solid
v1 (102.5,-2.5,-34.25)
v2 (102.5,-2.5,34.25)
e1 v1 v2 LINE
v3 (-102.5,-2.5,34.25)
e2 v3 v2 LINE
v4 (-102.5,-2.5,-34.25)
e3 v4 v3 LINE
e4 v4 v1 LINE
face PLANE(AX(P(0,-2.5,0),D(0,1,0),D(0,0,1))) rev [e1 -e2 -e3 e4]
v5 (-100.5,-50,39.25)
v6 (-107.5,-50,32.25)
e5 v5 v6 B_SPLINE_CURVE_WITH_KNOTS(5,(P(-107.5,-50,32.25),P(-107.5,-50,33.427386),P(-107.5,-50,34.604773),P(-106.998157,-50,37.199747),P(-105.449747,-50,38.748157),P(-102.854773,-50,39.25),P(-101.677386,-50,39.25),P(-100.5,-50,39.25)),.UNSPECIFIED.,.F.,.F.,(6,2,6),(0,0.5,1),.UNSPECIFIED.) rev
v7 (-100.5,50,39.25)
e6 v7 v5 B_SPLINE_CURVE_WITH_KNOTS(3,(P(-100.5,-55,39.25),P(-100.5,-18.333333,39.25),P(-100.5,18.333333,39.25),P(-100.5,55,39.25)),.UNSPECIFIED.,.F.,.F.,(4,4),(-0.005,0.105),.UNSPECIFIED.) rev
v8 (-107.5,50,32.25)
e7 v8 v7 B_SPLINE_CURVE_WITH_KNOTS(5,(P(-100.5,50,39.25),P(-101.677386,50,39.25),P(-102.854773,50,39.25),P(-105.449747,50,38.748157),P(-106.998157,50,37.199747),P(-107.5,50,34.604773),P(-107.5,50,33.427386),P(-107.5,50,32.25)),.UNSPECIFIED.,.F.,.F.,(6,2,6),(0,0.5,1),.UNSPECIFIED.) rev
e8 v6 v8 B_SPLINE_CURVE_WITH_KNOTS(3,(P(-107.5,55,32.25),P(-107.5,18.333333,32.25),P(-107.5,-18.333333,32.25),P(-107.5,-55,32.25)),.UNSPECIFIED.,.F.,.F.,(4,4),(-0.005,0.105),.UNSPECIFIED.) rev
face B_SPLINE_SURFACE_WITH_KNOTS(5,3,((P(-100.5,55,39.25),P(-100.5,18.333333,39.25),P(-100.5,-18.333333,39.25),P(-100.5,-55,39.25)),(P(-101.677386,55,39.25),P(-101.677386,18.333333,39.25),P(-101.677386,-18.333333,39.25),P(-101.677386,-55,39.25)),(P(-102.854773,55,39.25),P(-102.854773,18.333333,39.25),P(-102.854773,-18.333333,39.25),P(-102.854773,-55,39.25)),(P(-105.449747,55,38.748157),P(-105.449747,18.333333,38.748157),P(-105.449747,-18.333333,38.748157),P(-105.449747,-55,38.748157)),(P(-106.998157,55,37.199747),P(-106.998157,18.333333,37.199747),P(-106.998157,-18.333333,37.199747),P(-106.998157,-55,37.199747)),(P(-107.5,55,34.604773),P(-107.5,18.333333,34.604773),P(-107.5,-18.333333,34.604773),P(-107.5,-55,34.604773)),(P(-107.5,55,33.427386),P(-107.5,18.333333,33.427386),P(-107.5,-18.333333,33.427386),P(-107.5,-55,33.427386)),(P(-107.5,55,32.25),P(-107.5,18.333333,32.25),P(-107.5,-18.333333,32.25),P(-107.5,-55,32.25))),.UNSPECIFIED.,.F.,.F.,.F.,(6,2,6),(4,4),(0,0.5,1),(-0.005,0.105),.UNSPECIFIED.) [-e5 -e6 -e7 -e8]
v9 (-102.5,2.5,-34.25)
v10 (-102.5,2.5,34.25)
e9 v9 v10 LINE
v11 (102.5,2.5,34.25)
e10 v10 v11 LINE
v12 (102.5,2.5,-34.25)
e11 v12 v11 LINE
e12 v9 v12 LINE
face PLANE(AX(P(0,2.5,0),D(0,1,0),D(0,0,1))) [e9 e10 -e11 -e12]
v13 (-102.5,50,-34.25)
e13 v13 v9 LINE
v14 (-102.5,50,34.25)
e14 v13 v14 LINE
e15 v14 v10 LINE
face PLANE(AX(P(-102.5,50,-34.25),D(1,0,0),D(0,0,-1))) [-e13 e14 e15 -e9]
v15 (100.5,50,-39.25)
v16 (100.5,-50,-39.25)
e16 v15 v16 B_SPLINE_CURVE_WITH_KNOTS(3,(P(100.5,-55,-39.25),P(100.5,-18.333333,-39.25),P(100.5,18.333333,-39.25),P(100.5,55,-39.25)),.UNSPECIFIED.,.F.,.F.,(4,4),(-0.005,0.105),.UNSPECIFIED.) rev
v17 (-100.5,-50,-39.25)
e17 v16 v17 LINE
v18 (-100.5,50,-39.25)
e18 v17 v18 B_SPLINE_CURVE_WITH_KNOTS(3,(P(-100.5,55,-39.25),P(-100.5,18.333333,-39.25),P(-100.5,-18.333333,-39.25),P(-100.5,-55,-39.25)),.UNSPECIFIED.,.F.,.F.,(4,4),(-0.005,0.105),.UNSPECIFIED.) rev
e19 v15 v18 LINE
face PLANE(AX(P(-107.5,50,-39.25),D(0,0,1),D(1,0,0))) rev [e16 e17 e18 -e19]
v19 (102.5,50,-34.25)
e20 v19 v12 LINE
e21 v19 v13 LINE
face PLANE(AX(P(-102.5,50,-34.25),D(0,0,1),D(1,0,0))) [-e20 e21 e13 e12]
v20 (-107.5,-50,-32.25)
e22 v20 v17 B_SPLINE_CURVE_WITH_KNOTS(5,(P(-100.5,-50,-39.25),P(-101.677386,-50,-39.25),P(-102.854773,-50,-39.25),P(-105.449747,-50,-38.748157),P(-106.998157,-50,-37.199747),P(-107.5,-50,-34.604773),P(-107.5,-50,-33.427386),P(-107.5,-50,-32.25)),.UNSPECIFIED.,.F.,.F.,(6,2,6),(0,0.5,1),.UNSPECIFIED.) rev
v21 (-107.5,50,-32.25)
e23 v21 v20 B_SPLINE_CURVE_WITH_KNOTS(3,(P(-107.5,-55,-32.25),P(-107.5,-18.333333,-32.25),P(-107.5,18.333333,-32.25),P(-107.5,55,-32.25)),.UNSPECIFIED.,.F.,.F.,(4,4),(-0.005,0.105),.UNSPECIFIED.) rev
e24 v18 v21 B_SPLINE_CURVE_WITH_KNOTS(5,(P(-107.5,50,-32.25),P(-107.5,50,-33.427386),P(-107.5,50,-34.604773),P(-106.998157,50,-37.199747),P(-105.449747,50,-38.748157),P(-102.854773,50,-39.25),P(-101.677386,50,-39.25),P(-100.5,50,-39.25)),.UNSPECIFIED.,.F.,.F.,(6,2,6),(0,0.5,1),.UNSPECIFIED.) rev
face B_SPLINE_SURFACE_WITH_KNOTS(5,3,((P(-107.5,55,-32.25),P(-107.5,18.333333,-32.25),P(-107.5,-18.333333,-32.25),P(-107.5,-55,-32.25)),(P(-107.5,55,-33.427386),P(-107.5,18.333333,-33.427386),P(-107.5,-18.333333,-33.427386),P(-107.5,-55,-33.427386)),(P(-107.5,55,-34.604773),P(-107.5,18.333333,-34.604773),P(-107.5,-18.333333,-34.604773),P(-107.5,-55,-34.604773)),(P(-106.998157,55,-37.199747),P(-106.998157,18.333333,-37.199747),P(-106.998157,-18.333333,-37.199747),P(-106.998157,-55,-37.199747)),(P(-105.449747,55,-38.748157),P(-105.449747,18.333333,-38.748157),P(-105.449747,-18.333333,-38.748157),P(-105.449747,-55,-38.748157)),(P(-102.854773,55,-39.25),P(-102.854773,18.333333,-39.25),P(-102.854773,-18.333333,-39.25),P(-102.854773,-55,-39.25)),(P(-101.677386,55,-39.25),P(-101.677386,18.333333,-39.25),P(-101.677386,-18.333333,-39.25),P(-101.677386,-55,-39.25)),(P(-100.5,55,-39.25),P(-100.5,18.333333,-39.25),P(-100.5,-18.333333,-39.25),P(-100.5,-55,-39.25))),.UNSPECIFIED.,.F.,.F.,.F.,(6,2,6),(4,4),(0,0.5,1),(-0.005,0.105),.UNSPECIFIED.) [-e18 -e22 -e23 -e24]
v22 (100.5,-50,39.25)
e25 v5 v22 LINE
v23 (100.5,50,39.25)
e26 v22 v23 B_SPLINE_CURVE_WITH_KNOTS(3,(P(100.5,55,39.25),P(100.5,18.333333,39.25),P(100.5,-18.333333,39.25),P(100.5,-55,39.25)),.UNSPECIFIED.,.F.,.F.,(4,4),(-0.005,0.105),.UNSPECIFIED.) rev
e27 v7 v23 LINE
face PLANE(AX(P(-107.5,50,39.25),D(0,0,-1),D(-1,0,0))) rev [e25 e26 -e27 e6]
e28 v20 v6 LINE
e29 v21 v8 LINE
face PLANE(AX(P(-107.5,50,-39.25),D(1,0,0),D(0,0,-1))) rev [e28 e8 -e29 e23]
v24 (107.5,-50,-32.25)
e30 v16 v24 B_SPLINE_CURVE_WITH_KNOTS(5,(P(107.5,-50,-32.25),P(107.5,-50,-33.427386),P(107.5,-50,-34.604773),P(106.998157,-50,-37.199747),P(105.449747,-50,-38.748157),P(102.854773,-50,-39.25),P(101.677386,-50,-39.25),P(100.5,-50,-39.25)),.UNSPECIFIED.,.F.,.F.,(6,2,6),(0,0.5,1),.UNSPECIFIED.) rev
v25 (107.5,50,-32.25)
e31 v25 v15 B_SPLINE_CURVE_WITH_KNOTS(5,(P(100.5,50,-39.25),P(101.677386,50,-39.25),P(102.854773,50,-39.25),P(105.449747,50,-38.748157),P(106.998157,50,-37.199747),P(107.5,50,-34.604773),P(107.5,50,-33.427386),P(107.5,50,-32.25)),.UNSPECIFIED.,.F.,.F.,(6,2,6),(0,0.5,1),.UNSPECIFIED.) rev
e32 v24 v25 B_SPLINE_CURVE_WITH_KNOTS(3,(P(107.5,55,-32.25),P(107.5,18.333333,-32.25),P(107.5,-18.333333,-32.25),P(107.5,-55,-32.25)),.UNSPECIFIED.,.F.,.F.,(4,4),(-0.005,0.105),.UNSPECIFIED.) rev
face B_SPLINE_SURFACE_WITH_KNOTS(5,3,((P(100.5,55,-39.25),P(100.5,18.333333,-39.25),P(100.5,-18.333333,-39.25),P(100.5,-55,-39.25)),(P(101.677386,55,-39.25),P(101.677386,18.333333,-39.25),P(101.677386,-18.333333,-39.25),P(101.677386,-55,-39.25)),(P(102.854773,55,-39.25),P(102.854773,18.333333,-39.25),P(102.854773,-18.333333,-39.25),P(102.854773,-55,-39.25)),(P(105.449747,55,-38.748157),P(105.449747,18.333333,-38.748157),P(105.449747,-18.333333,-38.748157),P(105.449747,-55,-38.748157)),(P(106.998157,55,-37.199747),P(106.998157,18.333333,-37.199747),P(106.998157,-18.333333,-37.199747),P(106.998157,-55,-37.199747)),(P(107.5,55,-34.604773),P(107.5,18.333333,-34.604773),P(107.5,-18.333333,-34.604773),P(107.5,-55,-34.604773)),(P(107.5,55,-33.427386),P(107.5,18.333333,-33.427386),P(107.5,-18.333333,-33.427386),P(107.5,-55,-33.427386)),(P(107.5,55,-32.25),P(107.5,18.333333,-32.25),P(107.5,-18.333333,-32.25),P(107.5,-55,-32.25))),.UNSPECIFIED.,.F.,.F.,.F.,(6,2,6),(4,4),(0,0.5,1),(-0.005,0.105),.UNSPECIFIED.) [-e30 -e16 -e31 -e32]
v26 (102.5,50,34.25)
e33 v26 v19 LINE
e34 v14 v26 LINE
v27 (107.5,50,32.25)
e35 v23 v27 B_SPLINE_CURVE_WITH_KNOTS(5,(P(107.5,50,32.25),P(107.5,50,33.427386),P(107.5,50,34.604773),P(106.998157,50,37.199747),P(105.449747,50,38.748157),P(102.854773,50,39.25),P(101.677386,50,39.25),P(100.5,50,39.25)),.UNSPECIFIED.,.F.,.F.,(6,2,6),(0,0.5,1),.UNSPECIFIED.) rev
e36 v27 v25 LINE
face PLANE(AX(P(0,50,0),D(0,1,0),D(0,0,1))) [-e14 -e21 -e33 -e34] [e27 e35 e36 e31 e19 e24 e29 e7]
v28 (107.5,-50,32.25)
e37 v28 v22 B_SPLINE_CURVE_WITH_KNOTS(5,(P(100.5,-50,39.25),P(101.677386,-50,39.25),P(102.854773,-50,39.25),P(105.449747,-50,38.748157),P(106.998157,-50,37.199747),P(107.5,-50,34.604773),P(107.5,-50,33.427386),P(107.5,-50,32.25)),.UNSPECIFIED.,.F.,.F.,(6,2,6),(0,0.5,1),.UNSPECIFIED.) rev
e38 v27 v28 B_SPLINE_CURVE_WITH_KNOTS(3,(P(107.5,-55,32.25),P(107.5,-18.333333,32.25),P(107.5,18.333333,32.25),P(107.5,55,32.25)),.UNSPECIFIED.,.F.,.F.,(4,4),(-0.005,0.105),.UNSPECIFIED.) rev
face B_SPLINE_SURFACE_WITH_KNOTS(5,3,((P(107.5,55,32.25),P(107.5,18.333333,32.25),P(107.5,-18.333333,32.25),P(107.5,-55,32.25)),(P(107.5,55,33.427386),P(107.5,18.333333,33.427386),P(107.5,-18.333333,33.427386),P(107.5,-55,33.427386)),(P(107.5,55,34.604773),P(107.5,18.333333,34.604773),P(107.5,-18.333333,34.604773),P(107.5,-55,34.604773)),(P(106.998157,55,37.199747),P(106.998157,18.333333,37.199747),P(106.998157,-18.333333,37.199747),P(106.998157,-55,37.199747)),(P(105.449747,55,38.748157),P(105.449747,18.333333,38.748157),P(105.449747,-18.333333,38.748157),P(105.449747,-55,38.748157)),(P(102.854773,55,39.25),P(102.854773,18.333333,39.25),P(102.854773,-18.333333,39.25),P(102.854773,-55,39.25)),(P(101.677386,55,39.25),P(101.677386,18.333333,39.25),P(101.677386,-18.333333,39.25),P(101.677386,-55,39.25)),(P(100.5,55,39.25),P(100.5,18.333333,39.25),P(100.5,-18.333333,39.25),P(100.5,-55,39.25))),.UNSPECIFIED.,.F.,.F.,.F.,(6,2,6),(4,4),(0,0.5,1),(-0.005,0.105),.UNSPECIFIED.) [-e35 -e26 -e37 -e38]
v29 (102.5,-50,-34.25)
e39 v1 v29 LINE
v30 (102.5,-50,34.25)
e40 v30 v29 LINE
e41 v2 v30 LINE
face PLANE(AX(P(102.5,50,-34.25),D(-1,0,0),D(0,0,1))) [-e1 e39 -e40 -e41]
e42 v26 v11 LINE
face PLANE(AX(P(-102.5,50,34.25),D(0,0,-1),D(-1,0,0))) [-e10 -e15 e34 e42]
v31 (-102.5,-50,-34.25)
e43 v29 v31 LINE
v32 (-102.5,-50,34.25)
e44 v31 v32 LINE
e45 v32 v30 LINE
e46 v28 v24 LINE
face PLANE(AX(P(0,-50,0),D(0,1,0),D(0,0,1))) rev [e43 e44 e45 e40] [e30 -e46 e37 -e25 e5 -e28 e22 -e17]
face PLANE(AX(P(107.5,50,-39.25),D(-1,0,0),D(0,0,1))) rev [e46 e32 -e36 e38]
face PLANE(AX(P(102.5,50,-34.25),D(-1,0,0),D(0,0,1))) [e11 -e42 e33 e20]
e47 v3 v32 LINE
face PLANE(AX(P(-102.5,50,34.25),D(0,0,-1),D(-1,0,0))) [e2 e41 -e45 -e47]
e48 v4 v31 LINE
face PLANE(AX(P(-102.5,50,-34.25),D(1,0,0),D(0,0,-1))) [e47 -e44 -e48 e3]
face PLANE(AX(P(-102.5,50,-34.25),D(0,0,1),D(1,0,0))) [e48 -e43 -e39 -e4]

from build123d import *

# Parameters (mm, degrees)
SKETCH2_W           = 215
SKETCH2_H           = 78.5
SKETCH2_W_2         = 205
SKETCH2_H_2         = 68.5
BOSS_EXTRUDE1_DEPTH = 50
SKETCH2_2_W         = 205
SKETCH2_2_H         = 68.5
BOSS_EXTRUDE2_DEPTH = 2.5
FILLET1_SIZE        = 7


with BuildPart() as part:
    # Sketch2 → Boss-Extrude1 (new, symmetric)
    with BuildSketch(Plane(origin=(0, 0, 0), x_dir=(1, 0, 0), z_dir=(0, 1, 0))):
        Rectangle(SKETCH2_W, SKETCH2_H)
        Rectangle(SKETCH2_W_2, SKETCH2_H_2, mode=Mode.SUBTRACT)
    extrude(amount=BOSS_EXTRUDE1_DEPTH, both=True)

    # Sketch2<2> → Boss-Extrude2 (add, symmetric)
    with BuildSketch(Plane(origin=(0, 0, 0), x_dir=(1, 0, 0), z_dir=(0, 1, 0))):
        Rectangle(SKETCH2_2_W, SKETCH2_2_H)
    extrude(amount=BOSS_EXTRUDE2_DEPTH, both=True)

    # Fillet1
    # a fillet whose section is not a circle: 7 mm, written as the material it takes off along each edge
    with BuildSketch(Plane(origin=(-107.5, -67.5, -39.25), x_dir=(1, 0, 0), z_dir=(0, 1, 0)), Plane(origin=(-107.5, -67.5, 39.25), x_dir=(0, 0, -1), z_dir=(0, 1, 0)), Plane(origin=(107.5, 67.5, 39.25), x_dir=(0, 0, -1), z_dir=(0, -1, 0)), Plane(origin=(107.5, 67.5, -39.25), x_dir=(-1, 0, 0), z_dir=(0, -1, 0))) as fillet1_piece_1:
        with BuildLine():
            add(Edge.make_bspline([(FILLET1_SIZE, 0), (FILLET1_SIZE * 0.831801948466, 0), (FILLET1_SIZE * 0.663603896932, 0), (FILLET1_SIZE * 0.292893218813, -FILLET1_SIZE * 0.0716919198361), (FILLET1_SIZE * 0.0716919198361, -FILLET1_SIZE * 0.292893218813), (0, -FILLET1_SIZE * 0.663603896932), (0, -FILLET1_SIZE * 0.831801948466), (0, -FILLET1_SIZE)], knots=[0, 0, 0, 0, 0, 0, 0.5, 0.5, 1, 1, 1, 1, 1, 1], degree=5))
            Line((0, -FILLET1_SIZE), (0, 0))
            Line((0, 0), (FILLET1_SIZE, 0))
        make_face()
    extrude(amount=135, mode=Mode.SUBTRACT)


solid = part.part
